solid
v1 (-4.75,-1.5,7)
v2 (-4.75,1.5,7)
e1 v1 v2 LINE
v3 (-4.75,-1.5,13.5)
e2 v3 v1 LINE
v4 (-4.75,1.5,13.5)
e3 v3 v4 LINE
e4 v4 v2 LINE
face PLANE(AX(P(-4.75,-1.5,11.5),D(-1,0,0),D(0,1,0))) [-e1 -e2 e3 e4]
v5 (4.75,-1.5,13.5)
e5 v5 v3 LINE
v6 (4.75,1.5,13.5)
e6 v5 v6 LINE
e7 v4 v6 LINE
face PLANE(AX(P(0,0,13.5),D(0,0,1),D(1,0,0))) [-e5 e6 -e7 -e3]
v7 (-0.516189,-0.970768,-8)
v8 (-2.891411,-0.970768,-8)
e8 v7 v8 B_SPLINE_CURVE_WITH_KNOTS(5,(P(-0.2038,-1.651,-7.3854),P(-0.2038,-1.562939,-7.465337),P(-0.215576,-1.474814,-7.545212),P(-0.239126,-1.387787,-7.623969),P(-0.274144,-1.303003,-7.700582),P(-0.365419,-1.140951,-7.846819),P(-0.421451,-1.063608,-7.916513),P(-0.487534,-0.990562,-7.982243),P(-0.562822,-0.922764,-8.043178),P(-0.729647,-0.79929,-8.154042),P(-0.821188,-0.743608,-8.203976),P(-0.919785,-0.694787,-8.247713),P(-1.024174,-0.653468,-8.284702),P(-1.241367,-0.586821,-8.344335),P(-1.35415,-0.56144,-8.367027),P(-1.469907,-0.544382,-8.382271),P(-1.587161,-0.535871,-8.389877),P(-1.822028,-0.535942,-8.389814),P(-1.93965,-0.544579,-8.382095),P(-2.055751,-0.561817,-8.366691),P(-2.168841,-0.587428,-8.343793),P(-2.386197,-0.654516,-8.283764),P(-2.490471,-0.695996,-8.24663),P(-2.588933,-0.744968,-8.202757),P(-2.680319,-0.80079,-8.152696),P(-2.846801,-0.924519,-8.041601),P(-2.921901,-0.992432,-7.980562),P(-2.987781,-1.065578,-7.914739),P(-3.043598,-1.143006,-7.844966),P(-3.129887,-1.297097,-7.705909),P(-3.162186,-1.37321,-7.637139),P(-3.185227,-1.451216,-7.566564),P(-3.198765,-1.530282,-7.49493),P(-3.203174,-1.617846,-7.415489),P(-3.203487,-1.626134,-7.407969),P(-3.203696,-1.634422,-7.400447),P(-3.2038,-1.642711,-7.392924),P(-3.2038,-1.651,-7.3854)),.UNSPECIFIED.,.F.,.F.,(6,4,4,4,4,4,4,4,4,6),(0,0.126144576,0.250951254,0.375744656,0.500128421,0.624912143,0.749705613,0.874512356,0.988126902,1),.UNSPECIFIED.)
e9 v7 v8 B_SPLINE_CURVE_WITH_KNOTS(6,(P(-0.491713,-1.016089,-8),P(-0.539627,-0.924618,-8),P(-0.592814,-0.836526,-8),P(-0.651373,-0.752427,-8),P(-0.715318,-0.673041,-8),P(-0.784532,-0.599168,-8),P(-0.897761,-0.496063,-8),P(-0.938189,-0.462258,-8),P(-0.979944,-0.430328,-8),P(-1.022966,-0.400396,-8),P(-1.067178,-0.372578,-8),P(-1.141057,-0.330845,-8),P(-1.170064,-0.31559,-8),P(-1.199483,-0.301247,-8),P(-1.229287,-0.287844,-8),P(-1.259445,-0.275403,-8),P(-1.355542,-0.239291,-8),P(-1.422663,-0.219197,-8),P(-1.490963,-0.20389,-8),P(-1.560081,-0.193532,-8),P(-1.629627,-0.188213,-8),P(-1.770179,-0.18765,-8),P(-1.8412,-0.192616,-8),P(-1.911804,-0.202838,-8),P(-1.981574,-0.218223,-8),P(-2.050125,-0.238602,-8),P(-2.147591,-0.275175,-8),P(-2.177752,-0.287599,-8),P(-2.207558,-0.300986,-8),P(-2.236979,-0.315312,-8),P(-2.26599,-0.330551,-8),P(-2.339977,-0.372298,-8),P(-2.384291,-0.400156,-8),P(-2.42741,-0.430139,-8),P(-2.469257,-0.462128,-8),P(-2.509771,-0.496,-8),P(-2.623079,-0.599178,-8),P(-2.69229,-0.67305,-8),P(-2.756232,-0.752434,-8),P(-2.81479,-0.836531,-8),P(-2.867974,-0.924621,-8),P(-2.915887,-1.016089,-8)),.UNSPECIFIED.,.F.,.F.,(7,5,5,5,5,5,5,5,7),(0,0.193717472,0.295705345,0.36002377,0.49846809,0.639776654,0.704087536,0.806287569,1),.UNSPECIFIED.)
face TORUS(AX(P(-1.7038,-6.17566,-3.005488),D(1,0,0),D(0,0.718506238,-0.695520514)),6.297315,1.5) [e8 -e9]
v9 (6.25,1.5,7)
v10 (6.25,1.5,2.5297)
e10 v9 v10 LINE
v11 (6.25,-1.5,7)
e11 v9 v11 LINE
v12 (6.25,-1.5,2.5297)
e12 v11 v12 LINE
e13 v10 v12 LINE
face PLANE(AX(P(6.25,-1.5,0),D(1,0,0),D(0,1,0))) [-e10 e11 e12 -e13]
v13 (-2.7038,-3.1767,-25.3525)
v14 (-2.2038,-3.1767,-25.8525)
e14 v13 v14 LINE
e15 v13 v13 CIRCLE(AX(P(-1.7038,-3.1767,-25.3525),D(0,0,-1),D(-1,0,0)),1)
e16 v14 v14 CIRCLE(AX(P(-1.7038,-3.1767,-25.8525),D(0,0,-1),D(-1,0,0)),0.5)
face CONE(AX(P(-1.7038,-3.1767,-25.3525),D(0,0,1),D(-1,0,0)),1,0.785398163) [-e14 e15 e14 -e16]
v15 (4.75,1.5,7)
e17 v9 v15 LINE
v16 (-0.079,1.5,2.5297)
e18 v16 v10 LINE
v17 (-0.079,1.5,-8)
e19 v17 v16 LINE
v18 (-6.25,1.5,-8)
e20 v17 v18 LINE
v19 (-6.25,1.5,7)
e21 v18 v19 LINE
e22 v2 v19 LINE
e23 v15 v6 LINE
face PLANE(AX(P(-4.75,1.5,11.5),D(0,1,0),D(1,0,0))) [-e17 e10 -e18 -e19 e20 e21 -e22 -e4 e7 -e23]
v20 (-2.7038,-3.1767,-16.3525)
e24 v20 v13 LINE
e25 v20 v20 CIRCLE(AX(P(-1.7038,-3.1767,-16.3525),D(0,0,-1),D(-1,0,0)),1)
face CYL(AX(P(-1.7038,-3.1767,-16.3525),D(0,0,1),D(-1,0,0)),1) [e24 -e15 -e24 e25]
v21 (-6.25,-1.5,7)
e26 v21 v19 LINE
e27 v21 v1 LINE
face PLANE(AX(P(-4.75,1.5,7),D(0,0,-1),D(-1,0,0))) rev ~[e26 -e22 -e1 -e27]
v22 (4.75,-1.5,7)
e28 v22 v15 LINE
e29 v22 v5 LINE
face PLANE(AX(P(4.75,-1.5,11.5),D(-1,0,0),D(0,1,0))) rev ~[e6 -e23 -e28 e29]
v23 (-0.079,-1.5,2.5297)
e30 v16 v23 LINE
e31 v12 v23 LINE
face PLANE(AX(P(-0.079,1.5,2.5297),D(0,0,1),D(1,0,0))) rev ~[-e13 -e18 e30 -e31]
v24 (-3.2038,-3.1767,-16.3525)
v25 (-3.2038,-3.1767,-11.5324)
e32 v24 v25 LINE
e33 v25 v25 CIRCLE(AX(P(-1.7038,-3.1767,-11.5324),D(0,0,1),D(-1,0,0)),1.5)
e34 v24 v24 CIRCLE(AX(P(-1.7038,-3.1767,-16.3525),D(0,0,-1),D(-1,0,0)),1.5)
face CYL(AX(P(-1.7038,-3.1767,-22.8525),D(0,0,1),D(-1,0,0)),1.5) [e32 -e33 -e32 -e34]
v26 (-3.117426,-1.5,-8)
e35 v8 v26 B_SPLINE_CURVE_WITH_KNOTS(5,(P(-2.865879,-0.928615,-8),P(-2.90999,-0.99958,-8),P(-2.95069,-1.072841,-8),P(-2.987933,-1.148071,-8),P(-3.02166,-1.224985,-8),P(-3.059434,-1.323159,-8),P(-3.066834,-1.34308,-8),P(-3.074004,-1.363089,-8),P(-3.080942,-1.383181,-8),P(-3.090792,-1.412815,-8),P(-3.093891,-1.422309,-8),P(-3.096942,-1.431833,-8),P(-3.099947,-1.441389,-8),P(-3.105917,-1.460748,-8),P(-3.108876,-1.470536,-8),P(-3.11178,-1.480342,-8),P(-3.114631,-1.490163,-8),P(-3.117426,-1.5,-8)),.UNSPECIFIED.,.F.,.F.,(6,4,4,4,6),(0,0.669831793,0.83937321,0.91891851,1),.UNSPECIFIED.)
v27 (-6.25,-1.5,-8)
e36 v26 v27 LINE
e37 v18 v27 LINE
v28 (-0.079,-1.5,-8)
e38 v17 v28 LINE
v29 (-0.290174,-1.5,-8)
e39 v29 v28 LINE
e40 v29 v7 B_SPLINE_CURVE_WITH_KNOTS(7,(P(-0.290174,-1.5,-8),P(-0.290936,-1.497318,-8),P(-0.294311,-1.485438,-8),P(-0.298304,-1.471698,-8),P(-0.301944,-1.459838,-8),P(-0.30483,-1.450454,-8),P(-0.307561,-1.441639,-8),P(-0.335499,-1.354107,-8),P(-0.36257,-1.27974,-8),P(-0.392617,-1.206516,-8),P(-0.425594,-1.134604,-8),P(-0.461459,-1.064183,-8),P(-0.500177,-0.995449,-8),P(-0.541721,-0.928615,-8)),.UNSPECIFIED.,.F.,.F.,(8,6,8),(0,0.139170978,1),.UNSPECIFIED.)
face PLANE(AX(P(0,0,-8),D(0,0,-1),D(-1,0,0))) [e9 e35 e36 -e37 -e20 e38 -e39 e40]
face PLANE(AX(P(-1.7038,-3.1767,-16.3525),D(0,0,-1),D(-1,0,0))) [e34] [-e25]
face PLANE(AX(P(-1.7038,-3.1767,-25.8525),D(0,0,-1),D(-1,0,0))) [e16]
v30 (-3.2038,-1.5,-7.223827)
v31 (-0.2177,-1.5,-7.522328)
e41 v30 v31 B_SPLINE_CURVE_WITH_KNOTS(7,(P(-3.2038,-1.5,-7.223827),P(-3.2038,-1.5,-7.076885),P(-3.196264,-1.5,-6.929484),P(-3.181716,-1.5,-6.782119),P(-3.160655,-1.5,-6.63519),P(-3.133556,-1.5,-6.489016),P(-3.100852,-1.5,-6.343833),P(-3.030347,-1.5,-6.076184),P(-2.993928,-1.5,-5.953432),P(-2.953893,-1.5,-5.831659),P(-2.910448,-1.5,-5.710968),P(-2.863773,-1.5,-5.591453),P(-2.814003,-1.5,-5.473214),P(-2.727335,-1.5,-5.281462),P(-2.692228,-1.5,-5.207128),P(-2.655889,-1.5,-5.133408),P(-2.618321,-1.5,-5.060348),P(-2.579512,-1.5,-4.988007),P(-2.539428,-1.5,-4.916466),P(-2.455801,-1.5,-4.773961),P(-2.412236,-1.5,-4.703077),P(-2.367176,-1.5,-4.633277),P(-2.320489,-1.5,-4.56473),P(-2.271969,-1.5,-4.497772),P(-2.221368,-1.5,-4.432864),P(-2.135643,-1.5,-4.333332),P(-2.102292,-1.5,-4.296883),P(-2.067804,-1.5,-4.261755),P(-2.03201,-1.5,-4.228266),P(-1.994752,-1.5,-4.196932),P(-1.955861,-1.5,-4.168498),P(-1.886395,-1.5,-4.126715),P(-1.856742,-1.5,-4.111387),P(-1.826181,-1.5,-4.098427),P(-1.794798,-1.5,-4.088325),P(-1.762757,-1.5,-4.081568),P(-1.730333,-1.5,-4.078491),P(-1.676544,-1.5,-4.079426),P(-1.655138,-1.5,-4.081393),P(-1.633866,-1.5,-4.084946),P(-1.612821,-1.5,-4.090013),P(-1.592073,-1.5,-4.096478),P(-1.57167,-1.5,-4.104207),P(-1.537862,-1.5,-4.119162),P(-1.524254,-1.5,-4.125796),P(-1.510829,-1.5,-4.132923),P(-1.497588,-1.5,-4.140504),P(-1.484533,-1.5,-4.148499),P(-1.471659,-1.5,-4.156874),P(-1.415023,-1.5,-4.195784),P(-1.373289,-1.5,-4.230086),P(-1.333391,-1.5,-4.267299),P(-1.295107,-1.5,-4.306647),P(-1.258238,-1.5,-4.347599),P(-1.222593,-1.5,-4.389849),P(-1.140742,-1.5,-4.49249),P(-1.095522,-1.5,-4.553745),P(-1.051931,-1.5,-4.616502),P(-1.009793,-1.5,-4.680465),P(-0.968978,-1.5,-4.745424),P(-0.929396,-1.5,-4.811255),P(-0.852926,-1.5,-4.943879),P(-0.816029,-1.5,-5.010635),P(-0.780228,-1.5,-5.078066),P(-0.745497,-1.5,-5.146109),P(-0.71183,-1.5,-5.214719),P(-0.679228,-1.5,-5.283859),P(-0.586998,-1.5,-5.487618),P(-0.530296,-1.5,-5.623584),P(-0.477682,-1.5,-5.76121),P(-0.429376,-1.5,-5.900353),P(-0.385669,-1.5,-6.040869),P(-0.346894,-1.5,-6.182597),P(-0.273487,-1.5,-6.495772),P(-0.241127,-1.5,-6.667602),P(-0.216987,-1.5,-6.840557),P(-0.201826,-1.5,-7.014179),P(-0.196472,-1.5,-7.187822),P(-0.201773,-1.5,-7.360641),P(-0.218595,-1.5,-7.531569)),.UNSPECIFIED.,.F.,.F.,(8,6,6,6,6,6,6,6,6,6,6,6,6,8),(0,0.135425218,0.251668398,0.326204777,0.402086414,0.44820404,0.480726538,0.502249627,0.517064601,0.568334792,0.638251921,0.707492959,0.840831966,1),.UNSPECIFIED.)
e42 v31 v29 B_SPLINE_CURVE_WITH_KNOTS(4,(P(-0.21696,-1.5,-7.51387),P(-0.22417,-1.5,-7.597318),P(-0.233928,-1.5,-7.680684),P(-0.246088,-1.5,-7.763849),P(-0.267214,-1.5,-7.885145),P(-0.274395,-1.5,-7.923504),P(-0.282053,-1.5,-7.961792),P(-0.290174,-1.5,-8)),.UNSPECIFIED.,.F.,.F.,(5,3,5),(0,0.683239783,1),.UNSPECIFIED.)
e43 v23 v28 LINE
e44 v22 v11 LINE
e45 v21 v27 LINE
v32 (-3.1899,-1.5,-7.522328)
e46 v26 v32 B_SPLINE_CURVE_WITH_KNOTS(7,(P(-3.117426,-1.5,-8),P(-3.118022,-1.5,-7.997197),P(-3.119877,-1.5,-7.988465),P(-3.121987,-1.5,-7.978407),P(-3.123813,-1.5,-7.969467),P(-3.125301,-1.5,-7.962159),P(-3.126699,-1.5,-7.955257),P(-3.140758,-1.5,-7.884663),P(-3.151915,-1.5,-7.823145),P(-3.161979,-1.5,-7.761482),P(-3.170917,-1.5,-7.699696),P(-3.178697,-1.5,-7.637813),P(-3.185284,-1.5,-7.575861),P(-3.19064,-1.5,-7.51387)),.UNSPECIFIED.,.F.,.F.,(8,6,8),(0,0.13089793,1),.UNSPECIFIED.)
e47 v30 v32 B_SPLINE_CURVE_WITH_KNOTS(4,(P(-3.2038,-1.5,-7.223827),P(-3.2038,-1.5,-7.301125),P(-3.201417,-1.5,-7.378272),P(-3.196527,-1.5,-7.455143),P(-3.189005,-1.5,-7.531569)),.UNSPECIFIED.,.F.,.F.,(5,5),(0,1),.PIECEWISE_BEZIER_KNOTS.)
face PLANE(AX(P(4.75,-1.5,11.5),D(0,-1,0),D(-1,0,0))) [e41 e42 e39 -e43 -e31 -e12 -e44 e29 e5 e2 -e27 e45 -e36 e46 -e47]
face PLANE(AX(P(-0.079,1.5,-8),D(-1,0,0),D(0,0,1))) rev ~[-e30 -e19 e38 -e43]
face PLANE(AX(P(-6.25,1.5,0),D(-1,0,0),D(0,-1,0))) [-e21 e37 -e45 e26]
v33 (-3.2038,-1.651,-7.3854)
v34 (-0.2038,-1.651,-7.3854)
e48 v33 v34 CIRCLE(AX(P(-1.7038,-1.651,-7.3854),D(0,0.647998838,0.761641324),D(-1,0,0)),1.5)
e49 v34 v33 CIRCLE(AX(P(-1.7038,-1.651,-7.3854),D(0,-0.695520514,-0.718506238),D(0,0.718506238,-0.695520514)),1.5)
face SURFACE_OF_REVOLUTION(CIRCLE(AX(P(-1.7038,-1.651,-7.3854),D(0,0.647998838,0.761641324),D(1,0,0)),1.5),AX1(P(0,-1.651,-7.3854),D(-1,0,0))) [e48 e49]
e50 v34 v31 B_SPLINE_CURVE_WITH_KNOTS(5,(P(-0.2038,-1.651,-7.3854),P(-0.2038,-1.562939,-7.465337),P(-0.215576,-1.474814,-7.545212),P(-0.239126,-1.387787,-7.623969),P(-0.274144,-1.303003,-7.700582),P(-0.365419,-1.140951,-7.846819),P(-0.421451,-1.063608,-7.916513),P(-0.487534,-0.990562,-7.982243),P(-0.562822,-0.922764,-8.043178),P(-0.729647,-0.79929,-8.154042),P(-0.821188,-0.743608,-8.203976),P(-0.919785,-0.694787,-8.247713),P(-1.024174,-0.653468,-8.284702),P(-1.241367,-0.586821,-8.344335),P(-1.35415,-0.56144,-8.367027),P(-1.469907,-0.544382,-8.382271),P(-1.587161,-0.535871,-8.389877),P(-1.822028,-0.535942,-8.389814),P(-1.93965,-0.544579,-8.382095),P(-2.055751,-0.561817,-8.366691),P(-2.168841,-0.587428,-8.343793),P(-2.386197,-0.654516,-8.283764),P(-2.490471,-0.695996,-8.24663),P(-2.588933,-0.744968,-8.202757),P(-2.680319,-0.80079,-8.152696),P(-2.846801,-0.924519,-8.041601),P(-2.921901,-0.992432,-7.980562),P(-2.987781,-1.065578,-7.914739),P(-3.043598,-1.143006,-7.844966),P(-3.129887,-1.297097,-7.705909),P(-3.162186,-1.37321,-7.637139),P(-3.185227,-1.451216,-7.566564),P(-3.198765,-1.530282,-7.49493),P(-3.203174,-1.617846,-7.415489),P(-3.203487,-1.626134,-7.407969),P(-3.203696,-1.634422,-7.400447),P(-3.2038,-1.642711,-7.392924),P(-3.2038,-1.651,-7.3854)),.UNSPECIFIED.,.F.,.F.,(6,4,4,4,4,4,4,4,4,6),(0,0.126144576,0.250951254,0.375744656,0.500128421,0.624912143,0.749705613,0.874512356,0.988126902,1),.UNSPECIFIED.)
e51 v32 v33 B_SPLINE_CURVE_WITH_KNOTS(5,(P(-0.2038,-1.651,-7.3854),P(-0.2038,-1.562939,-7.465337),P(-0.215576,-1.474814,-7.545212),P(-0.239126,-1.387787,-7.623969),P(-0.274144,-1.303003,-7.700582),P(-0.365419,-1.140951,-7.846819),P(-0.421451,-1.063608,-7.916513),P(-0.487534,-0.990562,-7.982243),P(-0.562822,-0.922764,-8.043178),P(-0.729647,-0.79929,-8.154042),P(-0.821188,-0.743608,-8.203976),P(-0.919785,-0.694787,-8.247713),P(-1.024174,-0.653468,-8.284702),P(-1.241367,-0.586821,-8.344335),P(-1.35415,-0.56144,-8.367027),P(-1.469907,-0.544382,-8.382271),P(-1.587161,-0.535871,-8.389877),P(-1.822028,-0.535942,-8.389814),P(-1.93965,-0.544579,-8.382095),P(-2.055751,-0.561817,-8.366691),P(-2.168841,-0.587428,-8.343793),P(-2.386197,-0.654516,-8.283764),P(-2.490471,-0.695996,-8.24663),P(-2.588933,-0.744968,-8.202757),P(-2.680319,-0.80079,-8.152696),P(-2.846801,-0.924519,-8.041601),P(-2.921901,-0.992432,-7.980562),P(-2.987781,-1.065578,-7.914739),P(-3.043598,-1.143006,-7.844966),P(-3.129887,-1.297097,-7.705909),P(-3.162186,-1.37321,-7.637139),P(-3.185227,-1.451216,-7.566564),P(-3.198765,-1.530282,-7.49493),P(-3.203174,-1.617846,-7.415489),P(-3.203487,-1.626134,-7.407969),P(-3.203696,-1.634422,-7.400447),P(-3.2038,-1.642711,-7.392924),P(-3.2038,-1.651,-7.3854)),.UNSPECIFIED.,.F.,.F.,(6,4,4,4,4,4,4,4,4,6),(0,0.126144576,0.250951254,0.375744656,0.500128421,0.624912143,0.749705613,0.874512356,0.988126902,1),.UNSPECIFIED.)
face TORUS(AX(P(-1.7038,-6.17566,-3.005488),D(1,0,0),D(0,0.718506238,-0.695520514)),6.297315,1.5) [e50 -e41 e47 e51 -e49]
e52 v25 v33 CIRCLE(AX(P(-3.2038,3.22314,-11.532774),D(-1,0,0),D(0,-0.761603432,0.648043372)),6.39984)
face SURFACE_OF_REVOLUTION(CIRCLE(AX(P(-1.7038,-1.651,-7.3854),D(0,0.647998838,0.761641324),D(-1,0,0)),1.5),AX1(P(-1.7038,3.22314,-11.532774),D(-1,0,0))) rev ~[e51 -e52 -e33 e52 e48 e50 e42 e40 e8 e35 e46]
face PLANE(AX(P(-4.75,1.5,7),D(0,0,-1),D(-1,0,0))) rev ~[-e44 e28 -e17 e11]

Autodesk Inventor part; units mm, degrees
ref_plane "YZ Plane" through (0, 0, 0) normal (1, 0, 0) x (0, 1, 0)
sketch "草图1" plane through (0, 0, 0) normal (0, 0, 1) x (1, 0, 0)
  line L0 (4.75, -1.5) -> (-4.75, -1.5)
  line L1 (-4.75, -1.5) -> (-4.75, 1.5)
  line L2 (-4.75, 1.5) -> (4.75, 1.5)
  line L3 (4.75, 1.5) -> (4.75, -1.5)
  line L4 (4.75, -1.5) -> (-4.75, 1.5) construction
  line L5 (-4.75, -1.5) -> (4.75, 1.5) construction
  circle A0 centre (0, 0) radius 1
  dimension "d0" = 3
  dimension "d1" = 2
  dimension "d2" = 9.5
extrude "拉伸1" add sketch "草图1" along normal blind 3
sketch "草图2" plane through (0, 0, 3) normal (0, 0, 1) x (1, 0, 0)
  line L0 (4.75, 1.5) -> (-4.75, 1.5) projected
  line L1 (-4.75, 1.5) -> (-4.75, -1.5) projected
  line L2 (-4.75, -1.5) -> (4.75, -1.5) projected
  line L3 (4.75, -1.5) -> (4.75, 1.5) projected
  circle A0 centre (0, 0) radius 1 projected
extrude "拉伸2" add sketch "草图2" along normal blind 10 contours L3 L2 L1 L0 | A0
sketch "草图3" plane through (-4.75, 1.5, 0) normal (0, 1, 0) x (1, 0, 0)
  line L0 (-1.5, 0) -> (11, 0)
  line L1 (11, 0) -> (11, -7)
  line L2 (11, -7) -> (-1.5, -7)
  line L3 (-1.5, -7) -> (-1.5, 0)
  line L4 (9.5, 0) -> (9.5, -13) projected
  line L5 (0, 0) -> (0, -13) projected
  line L6 (9.5, 0) -> (0, 0) projected
  point P0 (4.75, 0)
  point P1 (-1.5, -3.5)
  point P2 (9.5, -7)
  point P3 (0, -7)
  dimension "d8" = 1.5
  dimension "d9" = 1.5
  dimension "d15" = 7
extrude "拉伸3" add sketch "草图3" against normal blind 3
move faces "移动1" translate (0, 0, 2) faces at (1.5833, 0.5, 13)
sketch "草图4" plane through (0, 0, 0) normal (0, 0, -1) x (-1, 0, 0)
  circle A0 centre (0, 0) radius 1.5
  dimension "d16" = 3
extrude "拉伸4" add sketch "草图4" along normal blind 0.5
ref_plane "工作平面1" through (11.9199, 26.93, -22.8525) normal (0, 0, 1) x (-1, 0, 0)
sketch "草图5" plane through (11.9199, 26.93, -22.8525) normal (0, 0, 1) x (-1, 0, 0)
  circle A0 centre (13.6237, 30.1067) radius 1.5
  circle A1 centre (13.716, 24.2534) radius 1.5
  circle A2 centre (13.6237, 30.1067) radius 1.5
  point P0 (11.9199, 26.93)
  dimension "d19" = 3
sketch "草图7" plane through (0, 0, -0.5) normal (0, 0, -1) x (-1, 0, 0)
  circle A0 centre (0, 0) radius 1.5 projected
ref_plane "工作平面2" through (11.9199, 26.93, -12.8525) normal (0, 0, 1) x (-1, 0, 0)
sketch "草图8" plane through (11.9199, 26.93, -12.8525) normal (0, 0, 1) x (-1, 0, 0)
  circle A0 centre (12.3625, 23.27) radius 1.5
  point P0 (11.9199, 26.93)
sketch "草图9" plane through (0, 0, 0) normal (1, 0, 0) x (0, 1, 0)
  line L0 (-4.6767, -22.8525) -> (-1.6767, -22.8525) projected
  line L1 (-3.1767, -22.8525) -> (-3.1767, -11.5324)
  arc A0 (-1.651, -7.3854) -> (-3.1767, -11.5324) centre (3.2225, -11.5324) ccw
  arc A1 (-1.651, -7.3854) -> (0.0125, -4.1729) centre (-6.1762, -3.0051) ccw
  point P0 (-3.6148, -22.5313)
  point P1 (-2.7659, -4.1729)
sweep "扫掠1" add profiles "草图5" path "草图9" path curves L1 A0 A1 contours A0
loft "放样1" add section 1 edges at (1.5, 0, -0.5) section 2 edges at (-0.2038, 0.0125, -4.1729)
sketch "草图15" plane through (0, 0, 0) normal (0, 0, -1) x (-1, 0, 0)
  line L0 (-6.25, 1.5) -> (0, 1.5) projected
  line L1 (4.75, -1.5) -> (6.25, -1.5) projected
  line L2 (-6.25, 1.5) -> (6.25, 1.5)
  line L3 (6.25, 1.5) -> (6.25, -1.5)
  line L4 (6.25, -1.5) -> (-6.25, -1.5)
  line L5 (-6.25, -1.5) -> (-6.25, 1.5)
  point P0 (0, 0)
  point P1 (0, 1.5)
extrude "拉伸9" add sketch "草图15" along normal blind 8
sketch "草图16" plane through (4.75, 1.5, 7) normal (0, 1, 0) x (1, 0, 0)
  line L0 (1.5, 15) -> (-11, 15) projected
  line L1 (1.5, 15) -> (-4.829, 15)
  line L2 (-4.829, 15) -> (-4.829, 4.4703)
  line L3 (-4.829, 4.4703) -> (1.5, 4.4703)
  line L4 (1.5, 4.4703) -> (1.5, 15)
  point P0 (-4.75, 7)
extrude "拉伸10" cut sketch "草图16" against normal blind 6.75
sketch "草图17" plane through (-1.7038, -3.1767, -22.8525) normal (0, 0, -1) x (-1, 0, 0)
  circle A0 centre (0, 0) radius 1.5 projected
  circle A1 centre (0, 0) radius 1
  point P0 (-1.7038, 3.1767)
  dimension "d46" = 2
ref_plane "工作平面3" through (0.201, 1.0367, -16.3525) normal (0, 0, -1) x (0, 1, 0)
extrude "拉伸11" cut sketch "草图17" against normal up to surface (6.5 mm away)
sketch "草图18" plane through (-1.7038, -3.1767, -16.3525) normal (0, 0, -1) x (-1, 0, 0)
  circle A0 centre (0, 0) radius 1 projected
  point P0 (-1.7038, 3.1767)
extrude "拉伸12" add sketch "草图18" along normal blind 9.5
chamfer "倒角2" distance 0.5 angle 45 1 edges at (-0.7038, -3.1767, -25.8525)
offset faces "大小2" outward -3.5 faces at (1.5833, -0.5, 15)
offset faces "大小3" outward 2 faces at (1.5833, -0.5, 11.5)
properties part number "轴系按钮2"
